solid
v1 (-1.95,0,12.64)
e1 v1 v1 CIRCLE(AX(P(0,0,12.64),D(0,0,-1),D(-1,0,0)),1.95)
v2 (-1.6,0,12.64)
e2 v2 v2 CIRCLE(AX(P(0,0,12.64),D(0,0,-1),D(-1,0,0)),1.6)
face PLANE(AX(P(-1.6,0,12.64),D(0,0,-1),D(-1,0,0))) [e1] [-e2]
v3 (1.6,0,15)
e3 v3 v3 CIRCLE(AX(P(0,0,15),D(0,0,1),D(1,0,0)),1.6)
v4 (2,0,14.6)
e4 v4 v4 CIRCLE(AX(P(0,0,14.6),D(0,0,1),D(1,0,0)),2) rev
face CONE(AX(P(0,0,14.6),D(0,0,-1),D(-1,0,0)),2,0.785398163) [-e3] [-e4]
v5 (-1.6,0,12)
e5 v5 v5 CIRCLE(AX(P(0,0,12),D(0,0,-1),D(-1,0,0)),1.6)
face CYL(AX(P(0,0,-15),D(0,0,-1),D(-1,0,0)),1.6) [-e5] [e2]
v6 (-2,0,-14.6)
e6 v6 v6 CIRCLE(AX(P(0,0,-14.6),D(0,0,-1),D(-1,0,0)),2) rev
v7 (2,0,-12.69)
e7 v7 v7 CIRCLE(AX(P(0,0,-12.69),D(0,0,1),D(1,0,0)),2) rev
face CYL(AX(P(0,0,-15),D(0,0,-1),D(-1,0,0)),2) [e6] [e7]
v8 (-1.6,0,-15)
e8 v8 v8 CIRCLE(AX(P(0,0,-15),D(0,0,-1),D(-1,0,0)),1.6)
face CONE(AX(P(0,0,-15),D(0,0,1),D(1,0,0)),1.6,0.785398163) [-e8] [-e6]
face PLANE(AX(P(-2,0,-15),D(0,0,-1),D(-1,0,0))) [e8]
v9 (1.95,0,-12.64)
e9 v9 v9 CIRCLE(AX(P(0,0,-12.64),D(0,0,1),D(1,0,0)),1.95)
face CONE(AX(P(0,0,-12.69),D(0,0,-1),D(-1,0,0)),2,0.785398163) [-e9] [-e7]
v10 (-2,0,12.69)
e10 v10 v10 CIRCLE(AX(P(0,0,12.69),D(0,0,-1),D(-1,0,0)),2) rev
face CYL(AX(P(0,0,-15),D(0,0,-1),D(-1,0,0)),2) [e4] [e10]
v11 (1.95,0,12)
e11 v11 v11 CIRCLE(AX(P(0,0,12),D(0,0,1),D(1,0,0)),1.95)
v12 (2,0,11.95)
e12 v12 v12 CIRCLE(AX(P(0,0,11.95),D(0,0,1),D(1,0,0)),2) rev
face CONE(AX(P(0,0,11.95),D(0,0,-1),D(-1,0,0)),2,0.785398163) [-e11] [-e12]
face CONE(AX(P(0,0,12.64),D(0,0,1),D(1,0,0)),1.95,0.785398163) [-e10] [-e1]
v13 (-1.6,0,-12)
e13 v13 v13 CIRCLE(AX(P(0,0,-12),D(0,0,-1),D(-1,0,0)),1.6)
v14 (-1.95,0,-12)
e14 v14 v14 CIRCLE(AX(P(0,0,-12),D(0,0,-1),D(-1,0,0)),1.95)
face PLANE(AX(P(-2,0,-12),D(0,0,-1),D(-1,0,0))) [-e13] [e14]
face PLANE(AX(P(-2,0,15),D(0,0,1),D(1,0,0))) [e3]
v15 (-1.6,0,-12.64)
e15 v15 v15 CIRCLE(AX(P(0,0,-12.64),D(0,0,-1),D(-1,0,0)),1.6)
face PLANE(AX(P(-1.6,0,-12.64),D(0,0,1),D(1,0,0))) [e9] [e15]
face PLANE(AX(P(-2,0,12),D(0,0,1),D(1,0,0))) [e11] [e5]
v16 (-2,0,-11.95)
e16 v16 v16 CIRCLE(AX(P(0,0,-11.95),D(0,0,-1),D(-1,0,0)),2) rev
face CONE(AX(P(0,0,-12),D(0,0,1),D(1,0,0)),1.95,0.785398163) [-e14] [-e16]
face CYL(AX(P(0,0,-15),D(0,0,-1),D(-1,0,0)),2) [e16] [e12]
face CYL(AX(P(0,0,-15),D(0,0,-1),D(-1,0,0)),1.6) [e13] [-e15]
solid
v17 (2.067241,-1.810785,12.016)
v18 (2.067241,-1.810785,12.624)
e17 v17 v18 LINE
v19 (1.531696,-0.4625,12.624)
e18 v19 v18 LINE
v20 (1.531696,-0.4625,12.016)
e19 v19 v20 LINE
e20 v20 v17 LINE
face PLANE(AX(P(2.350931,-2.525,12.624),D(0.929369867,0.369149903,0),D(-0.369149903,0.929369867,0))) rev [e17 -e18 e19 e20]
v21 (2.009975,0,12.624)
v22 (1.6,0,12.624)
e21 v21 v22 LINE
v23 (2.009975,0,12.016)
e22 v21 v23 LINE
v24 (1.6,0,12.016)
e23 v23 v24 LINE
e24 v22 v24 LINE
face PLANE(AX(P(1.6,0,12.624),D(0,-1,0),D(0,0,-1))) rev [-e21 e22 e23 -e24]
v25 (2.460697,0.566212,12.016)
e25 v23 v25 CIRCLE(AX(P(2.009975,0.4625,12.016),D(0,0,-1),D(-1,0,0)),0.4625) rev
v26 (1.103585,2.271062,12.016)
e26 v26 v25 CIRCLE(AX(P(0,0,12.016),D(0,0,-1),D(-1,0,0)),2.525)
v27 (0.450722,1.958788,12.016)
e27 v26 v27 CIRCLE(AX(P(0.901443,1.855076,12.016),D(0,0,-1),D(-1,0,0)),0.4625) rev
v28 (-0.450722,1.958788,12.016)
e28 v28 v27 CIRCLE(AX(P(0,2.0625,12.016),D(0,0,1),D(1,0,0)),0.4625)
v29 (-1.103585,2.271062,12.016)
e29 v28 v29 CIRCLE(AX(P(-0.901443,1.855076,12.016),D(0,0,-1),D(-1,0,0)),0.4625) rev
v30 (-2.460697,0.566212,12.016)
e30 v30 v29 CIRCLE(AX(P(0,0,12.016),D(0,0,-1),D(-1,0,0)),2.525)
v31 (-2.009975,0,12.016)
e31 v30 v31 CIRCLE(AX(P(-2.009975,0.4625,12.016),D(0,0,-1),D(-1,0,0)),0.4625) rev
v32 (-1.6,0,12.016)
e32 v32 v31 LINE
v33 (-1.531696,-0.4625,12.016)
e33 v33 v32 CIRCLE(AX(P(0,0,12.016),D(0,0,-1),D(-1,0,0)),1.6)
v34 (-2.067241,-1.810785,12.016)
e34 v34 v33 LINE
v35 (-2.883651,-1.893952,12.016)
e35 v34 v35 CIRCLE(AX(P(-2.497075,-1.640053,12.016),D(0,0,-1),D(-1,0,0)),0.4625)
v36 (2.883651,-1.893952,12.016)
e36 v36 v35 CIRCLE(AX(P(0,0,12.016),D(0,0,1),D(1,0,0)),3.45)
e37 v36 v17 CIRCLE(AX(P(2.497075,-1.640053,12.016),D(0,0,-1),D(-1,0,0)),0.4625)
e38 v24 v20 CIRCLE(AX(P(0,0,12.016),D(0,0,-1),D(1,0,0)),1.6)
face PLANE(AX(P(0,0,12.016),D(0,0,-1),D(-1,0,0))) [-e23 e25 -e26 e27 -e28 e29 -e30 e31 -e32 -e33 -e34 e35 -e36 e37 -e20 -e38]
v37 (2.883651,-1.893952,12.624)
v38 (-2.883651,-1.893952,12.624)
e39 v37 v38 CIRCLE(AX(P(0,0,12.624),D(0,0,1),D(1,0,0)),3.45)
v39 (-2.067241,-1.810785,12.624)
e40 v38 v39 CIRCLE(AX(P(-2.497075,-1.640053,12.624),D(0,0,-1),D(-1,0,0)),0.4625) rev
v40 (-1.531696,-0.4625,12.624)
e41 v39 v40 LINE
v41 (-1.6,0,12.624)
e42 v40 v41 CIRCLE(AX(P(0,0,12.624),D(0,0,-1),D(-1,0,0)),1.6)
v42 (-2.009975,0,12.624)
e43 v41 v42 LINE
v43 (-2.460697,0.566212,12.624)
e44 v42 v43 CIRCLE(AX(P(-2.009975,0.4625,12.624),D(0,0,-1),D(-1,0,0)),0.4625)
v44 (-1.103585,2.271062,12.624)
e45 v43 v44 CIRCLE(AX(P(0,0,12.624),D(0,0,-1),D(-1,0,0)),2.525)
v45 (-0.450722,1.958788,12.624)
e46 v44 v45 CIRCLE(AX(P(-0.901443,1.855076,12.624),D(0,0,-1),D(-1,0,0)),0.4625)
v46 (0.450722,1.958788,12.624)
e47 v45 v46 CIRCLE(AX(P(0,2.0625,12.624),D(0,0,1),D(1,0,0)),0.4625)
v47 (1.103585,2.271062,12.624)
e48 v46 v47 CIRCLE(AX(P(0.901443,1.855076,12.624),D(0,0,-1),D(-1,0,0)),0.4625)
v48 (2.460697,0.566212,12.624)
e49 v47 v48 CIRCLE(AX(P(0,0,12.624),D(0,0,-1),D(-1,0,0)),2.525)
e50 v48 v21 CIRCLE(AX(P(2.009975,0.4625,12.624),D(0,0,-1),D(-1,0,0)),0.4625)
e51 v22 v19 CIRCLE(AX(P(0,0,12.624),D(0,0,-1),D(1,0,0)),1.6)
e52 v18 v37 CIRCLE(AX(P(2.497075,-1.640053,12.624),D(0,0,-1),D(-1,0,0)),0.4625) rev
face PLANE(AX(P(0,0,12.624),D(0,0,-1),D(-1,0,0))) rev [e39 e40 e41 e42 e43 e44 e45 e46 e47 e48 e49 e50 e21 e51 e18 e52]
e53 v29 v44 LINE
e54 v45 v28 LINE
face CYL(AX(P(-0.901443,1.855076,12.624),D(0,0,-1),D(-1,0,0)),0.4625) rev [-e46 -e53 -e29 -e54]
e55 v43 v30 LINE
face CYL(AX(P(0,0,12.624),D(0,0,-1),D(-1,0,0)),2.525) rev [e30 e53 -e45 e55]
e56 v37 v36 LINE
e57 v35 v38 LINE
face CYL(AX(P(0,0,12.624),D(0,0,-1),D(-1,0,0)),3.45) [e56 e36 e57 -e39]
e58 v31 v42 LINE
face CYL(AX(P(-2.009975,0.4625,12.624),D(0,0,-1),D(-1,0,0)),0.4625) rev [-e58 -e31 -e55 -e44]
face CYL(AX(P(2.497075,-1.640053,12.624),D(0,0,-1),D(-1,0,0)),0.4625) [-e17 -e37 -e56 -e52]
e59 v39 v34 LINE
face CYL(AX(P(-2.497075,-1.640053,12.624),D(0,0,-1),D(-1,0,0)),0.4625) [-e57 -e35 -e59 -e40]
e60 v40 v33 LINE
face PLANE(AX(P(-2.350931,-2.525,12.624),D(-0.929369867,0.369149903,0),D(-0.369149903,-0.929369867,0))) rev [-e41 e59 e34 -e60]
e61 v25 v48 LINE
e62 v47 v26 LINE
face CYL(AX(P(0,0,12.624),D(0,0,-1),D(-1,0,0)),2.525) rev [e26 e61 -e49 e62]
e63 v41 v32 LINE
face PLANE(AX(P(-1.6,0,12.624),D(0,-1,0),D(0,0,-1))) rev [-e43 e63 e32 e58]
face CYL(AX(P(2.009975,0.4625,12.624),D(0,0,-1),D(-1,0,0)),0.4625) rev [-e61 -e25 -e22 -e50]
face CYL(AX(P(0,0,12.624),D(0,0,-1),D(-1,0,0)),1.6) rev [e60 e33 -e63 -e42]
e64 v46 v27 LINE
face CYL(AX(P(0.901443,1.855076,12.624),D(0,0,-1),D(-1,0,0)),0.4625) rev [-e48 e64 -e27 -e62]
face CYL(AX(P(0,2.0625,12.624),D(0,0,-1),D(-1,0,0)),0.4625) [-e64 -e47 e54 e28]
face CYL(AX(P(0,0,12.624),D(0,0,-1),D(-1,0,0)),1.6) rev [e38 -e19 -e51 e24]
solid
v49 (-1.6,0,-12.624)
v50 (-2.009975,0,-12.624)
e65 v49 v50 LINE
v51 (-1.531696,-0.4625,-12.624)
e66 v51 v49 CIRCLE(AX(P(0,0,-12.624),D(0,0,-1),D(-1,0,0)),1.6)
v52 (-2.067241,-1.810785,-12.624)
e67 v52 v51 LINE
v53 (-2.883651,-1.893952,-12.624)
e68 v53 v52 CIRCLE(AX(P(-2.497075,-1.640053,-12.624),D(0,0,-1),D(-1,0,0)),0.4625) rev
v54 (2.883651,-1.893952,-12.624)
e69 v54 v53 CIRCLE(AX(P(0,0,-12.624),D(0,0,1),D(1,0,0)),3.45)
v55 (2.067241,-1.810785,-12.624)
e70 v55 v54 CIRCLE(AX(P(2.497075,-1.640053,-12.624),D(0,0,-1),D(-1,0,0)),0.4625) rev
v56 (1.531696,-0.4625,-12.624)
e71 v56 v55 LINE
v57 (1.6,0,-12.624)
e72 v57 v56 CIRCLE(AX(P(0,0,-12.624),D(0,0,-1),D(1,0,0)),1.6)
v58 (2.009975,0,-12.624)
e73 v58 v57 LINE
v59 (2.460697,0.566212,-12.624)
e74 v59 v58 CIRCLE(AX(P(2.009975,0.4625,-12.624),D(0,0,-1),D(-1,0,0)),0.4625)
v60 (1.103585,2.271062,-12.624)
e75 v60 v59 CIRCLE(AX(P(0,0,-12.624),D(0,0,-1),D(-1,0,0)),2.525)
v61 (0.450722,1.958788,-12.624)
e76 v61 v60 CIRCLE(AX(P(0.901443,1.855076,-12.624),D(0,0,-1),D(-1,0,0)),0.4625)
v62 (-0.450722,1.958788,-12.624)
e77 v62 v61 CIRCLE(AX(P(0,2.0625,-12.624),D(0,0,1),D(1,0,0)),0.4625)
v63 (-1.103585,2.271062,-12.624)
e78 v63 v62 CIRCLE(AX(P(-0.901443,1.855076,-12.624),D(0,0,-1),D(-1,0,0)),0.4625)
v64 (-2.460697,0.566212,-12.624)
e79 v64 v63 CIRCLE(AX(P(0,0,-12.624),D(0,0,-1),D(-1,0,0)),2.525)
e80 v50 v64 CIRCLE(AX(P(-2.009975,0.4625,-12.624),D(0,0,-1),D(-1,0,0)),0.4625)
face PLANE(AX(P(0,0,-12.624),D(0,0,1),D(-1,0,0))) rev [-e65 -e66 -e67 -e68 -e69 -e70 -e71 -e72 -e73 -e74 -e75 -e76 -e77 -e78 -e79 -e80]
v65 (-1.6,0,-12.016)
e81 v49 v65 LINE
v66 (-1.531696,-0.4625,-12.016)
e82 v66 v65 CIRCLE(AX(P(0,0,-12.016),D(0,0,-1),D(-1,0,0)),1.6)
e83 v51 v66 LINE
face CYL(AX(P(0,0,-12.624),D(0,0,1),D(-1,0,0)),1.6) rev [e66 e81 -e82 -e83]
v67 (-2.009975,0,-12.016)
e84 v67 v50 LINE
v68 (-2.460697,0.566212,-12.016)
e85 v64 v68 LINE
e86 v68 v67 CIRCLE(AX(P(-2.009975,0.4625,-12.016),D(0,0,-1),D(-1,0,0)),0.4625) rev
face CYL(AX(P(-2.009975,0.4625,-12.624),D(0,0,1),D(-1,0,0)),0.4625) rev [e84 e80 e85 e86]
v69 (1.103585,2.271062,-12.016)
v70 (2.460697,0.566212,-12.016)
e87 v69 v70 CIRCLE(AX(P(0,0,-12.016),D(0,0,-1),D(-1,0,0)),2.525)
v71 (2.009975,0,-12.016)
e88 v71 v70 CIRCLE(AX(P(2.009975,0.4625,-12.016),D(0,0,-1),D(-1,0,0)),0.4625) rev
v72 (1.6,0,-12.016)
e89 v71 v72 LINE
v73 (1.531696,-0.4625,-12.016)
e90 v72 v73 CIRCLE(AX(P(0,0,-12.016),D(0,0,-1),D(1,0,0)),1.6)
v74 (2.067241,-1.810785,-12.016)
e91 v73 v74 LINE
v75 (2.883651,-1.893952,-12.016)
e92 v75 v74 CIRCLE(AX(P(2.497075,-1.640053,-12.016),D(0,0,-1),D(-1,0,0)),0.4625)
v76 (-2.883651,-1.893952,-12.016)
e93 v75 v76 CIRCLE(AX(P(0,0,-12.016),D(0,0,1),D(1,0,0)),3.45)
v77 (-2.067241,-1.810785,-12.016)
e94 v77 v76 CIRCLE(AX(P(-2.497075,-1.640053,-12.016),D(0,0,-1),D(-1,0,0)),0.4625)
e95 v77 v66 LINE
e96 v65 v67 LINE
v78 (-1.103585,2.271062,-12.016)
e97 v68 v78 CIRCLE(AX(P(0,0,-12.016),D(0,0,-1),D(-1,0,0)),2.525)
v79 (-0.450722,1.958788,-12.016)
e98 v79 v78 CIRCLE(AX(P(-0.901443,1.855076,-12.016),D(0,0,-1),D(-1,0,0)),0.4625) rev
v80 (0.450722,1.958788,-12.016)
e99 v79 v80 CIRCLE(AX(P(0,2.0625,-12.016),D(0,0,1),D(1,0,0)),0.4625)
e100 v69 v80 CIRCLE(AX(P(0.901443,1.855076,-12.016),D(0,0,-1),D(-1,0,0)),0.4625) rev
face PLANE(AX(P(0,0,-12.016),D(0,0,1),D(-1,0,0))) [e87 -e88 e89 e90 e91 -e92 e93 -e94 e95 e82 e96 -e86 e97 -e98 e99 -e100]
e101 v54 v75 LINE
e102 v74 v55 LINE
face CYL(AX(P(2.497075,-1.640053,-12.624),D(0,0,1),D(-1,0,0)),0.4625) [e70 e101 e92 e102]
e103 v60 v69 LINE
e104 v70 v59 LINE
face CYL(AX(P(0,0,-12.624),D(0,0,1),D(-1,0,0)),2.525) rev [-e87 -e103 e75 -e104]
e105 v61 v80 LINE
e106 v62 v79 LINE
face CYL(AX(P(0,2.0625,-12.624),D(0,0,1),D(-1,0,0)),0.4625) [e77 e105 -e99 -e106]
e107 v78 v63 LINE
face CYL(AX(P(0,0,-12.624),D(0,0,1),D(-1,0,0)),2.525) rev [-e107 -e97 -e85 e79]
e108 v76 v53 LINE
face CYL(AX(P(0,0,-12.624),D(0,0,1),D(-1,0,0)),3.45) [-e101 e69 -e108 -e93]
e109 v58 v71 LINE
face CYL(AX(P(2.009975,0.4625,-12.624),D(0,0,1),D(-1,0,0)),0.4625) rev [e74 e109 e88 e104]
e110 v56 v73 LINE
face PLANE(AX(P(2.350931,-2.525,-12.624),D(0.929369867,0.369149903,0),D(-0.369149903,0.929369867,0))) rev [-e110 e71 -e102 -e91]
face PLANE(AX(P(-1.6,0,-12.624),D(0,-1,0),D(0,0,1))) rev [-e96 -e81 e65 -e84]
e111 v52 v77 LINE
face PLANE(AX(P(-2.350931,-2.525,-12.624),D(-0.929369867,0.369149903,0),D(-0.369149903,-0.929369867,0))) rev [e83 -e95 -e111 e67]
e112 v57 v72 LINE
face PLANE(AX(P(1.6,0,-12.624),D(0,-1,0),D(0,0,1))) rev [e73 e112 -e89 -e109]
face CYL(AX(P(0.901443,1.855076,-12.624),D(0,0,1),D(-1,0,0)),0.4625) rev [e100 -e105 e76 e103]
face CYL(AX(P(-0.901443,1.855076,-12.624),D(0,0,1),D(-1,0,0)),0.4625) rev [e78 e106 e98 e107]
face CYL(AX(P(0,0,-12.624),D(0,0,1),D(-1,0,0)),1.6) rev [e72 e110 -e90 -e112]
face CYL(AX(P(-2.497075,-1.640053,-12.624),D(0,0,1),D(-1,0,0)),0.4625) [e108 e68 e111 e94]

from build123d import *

# Parameters (mm, degrees)
CHAMFER1_SIZE       = 0.4
BOSS_EXTRUDE2_DEPTH = 0.304
FILLET1_R           = 0.4625
CHAMFER2_SIZE       = 0.05


with BuildPart() as part:
    # Sketch1 → Revolve1 (revolve)
    with BuildSketch(Plane(origin=(0, 0, 0), x_dir=(1, 0, 0), z_dir=(0, 1, 0))):
        Polygon((-2, 12), (-1.6, 12), (-1.6, 12.64), (-2, 12.64), (-2, 15), (0, 15), (0, -15), (-2, -15), (-2, -12.64), (-1.6, -12.64), (-1.6, -12), (-2, -12), align=None)
    revolve(axis=Axis((0, 0, -15), (0, 0, 1)))

    # Chamfer1
    chamfer1_edges = [part.edges().sort_by_distance(p)[0] for p in [
        (2, 0, 15),
        (2, 0, -15),
    ]]
    chamfer(chamfer1_edges, length=CHAMFER1_SIZE)

    # Chamfer2
    chamfer2_edges = [part.edges().sort_by_distance(p)[0] for p in [
        (2, 0, -12.64),
        (2, 0, -12),
        (2, 0, 12),
        (2, 0, 12.64),
    ]]
    chamfer(chamfer2_edges, length=CHAMFER2_SIZE)


with BuildPart() as body_2:
    # Sketch2 → Boss-Extrude2 (new, symmetric)
    with BuildSketch(Plane.XY.offset(12.32)):
        with BuildLine():
            Line((-2.350930667, -2.525), (-1.531696364, -0.4625))
            ThreePointArc((-1.531696364, -0.4625), (-1.582831984, -0.233758228), (-1.6, 0))
            Line((-1.6, 0), (-2.525, 0))
            ThreePointArc((-2.525, 0), (-1.975513934, 1.572567867), (-0.566212121, 2.460696819))
            Line((-0.566212121, 2.460696819), (-0.450721695, 1.958787879))
            ThreePointArc((-0.450721695, 1.958787879), (0, 1.6), (0.450721695, 1.958787879))
            Line((0.450721695, 1.958787879), (0.566212121, 2.460696819))
            ThreePointArc((0.566212121, 2.460696819), (1.975513934, 1.572567867), (2.525, 0))
            Line((2.525, 0), (1.6, 0))
            ThreePointArc((1.6, 0), (1.582831984, -0.233758228), (1.531696364, -0.4625))
            Line((1.531696364, -0.4625), (2.350930667, -2.525))
            ThreePointArc((2.350930667, -2.525), (0, 3.45), (-2.350930667, -2.525))
        make_face()
    extrude(amount=BOSS_EXTRUDE2_DEPTH, both=True)

    # Fillet1
    fillet1_edges = [body_2.edges().sort_by_distance(p)[0] for p in [
        (2.525, 0, 12.32),
        (-0.566212121, 2.460696819, 12.32),
        (-2.525, 0, 12.32),
        (0.566212121, 2.460696819, 12.32),
        (2.350930667, -2.525, 12.32),
        (-2.350930667, -2.525, 12.32),
    ]]
    fillet(fillet1_edges, radius=FILLET1_R - 0.0001)  # a hair under: the kernel refuses the full size


with BuildPart() as body_3:
    # Mirror1: mirrored copy
    add(body_2.part.mirror(Plane.XY))


solid = Compound([part.part, body_2.part, body_3.part])
